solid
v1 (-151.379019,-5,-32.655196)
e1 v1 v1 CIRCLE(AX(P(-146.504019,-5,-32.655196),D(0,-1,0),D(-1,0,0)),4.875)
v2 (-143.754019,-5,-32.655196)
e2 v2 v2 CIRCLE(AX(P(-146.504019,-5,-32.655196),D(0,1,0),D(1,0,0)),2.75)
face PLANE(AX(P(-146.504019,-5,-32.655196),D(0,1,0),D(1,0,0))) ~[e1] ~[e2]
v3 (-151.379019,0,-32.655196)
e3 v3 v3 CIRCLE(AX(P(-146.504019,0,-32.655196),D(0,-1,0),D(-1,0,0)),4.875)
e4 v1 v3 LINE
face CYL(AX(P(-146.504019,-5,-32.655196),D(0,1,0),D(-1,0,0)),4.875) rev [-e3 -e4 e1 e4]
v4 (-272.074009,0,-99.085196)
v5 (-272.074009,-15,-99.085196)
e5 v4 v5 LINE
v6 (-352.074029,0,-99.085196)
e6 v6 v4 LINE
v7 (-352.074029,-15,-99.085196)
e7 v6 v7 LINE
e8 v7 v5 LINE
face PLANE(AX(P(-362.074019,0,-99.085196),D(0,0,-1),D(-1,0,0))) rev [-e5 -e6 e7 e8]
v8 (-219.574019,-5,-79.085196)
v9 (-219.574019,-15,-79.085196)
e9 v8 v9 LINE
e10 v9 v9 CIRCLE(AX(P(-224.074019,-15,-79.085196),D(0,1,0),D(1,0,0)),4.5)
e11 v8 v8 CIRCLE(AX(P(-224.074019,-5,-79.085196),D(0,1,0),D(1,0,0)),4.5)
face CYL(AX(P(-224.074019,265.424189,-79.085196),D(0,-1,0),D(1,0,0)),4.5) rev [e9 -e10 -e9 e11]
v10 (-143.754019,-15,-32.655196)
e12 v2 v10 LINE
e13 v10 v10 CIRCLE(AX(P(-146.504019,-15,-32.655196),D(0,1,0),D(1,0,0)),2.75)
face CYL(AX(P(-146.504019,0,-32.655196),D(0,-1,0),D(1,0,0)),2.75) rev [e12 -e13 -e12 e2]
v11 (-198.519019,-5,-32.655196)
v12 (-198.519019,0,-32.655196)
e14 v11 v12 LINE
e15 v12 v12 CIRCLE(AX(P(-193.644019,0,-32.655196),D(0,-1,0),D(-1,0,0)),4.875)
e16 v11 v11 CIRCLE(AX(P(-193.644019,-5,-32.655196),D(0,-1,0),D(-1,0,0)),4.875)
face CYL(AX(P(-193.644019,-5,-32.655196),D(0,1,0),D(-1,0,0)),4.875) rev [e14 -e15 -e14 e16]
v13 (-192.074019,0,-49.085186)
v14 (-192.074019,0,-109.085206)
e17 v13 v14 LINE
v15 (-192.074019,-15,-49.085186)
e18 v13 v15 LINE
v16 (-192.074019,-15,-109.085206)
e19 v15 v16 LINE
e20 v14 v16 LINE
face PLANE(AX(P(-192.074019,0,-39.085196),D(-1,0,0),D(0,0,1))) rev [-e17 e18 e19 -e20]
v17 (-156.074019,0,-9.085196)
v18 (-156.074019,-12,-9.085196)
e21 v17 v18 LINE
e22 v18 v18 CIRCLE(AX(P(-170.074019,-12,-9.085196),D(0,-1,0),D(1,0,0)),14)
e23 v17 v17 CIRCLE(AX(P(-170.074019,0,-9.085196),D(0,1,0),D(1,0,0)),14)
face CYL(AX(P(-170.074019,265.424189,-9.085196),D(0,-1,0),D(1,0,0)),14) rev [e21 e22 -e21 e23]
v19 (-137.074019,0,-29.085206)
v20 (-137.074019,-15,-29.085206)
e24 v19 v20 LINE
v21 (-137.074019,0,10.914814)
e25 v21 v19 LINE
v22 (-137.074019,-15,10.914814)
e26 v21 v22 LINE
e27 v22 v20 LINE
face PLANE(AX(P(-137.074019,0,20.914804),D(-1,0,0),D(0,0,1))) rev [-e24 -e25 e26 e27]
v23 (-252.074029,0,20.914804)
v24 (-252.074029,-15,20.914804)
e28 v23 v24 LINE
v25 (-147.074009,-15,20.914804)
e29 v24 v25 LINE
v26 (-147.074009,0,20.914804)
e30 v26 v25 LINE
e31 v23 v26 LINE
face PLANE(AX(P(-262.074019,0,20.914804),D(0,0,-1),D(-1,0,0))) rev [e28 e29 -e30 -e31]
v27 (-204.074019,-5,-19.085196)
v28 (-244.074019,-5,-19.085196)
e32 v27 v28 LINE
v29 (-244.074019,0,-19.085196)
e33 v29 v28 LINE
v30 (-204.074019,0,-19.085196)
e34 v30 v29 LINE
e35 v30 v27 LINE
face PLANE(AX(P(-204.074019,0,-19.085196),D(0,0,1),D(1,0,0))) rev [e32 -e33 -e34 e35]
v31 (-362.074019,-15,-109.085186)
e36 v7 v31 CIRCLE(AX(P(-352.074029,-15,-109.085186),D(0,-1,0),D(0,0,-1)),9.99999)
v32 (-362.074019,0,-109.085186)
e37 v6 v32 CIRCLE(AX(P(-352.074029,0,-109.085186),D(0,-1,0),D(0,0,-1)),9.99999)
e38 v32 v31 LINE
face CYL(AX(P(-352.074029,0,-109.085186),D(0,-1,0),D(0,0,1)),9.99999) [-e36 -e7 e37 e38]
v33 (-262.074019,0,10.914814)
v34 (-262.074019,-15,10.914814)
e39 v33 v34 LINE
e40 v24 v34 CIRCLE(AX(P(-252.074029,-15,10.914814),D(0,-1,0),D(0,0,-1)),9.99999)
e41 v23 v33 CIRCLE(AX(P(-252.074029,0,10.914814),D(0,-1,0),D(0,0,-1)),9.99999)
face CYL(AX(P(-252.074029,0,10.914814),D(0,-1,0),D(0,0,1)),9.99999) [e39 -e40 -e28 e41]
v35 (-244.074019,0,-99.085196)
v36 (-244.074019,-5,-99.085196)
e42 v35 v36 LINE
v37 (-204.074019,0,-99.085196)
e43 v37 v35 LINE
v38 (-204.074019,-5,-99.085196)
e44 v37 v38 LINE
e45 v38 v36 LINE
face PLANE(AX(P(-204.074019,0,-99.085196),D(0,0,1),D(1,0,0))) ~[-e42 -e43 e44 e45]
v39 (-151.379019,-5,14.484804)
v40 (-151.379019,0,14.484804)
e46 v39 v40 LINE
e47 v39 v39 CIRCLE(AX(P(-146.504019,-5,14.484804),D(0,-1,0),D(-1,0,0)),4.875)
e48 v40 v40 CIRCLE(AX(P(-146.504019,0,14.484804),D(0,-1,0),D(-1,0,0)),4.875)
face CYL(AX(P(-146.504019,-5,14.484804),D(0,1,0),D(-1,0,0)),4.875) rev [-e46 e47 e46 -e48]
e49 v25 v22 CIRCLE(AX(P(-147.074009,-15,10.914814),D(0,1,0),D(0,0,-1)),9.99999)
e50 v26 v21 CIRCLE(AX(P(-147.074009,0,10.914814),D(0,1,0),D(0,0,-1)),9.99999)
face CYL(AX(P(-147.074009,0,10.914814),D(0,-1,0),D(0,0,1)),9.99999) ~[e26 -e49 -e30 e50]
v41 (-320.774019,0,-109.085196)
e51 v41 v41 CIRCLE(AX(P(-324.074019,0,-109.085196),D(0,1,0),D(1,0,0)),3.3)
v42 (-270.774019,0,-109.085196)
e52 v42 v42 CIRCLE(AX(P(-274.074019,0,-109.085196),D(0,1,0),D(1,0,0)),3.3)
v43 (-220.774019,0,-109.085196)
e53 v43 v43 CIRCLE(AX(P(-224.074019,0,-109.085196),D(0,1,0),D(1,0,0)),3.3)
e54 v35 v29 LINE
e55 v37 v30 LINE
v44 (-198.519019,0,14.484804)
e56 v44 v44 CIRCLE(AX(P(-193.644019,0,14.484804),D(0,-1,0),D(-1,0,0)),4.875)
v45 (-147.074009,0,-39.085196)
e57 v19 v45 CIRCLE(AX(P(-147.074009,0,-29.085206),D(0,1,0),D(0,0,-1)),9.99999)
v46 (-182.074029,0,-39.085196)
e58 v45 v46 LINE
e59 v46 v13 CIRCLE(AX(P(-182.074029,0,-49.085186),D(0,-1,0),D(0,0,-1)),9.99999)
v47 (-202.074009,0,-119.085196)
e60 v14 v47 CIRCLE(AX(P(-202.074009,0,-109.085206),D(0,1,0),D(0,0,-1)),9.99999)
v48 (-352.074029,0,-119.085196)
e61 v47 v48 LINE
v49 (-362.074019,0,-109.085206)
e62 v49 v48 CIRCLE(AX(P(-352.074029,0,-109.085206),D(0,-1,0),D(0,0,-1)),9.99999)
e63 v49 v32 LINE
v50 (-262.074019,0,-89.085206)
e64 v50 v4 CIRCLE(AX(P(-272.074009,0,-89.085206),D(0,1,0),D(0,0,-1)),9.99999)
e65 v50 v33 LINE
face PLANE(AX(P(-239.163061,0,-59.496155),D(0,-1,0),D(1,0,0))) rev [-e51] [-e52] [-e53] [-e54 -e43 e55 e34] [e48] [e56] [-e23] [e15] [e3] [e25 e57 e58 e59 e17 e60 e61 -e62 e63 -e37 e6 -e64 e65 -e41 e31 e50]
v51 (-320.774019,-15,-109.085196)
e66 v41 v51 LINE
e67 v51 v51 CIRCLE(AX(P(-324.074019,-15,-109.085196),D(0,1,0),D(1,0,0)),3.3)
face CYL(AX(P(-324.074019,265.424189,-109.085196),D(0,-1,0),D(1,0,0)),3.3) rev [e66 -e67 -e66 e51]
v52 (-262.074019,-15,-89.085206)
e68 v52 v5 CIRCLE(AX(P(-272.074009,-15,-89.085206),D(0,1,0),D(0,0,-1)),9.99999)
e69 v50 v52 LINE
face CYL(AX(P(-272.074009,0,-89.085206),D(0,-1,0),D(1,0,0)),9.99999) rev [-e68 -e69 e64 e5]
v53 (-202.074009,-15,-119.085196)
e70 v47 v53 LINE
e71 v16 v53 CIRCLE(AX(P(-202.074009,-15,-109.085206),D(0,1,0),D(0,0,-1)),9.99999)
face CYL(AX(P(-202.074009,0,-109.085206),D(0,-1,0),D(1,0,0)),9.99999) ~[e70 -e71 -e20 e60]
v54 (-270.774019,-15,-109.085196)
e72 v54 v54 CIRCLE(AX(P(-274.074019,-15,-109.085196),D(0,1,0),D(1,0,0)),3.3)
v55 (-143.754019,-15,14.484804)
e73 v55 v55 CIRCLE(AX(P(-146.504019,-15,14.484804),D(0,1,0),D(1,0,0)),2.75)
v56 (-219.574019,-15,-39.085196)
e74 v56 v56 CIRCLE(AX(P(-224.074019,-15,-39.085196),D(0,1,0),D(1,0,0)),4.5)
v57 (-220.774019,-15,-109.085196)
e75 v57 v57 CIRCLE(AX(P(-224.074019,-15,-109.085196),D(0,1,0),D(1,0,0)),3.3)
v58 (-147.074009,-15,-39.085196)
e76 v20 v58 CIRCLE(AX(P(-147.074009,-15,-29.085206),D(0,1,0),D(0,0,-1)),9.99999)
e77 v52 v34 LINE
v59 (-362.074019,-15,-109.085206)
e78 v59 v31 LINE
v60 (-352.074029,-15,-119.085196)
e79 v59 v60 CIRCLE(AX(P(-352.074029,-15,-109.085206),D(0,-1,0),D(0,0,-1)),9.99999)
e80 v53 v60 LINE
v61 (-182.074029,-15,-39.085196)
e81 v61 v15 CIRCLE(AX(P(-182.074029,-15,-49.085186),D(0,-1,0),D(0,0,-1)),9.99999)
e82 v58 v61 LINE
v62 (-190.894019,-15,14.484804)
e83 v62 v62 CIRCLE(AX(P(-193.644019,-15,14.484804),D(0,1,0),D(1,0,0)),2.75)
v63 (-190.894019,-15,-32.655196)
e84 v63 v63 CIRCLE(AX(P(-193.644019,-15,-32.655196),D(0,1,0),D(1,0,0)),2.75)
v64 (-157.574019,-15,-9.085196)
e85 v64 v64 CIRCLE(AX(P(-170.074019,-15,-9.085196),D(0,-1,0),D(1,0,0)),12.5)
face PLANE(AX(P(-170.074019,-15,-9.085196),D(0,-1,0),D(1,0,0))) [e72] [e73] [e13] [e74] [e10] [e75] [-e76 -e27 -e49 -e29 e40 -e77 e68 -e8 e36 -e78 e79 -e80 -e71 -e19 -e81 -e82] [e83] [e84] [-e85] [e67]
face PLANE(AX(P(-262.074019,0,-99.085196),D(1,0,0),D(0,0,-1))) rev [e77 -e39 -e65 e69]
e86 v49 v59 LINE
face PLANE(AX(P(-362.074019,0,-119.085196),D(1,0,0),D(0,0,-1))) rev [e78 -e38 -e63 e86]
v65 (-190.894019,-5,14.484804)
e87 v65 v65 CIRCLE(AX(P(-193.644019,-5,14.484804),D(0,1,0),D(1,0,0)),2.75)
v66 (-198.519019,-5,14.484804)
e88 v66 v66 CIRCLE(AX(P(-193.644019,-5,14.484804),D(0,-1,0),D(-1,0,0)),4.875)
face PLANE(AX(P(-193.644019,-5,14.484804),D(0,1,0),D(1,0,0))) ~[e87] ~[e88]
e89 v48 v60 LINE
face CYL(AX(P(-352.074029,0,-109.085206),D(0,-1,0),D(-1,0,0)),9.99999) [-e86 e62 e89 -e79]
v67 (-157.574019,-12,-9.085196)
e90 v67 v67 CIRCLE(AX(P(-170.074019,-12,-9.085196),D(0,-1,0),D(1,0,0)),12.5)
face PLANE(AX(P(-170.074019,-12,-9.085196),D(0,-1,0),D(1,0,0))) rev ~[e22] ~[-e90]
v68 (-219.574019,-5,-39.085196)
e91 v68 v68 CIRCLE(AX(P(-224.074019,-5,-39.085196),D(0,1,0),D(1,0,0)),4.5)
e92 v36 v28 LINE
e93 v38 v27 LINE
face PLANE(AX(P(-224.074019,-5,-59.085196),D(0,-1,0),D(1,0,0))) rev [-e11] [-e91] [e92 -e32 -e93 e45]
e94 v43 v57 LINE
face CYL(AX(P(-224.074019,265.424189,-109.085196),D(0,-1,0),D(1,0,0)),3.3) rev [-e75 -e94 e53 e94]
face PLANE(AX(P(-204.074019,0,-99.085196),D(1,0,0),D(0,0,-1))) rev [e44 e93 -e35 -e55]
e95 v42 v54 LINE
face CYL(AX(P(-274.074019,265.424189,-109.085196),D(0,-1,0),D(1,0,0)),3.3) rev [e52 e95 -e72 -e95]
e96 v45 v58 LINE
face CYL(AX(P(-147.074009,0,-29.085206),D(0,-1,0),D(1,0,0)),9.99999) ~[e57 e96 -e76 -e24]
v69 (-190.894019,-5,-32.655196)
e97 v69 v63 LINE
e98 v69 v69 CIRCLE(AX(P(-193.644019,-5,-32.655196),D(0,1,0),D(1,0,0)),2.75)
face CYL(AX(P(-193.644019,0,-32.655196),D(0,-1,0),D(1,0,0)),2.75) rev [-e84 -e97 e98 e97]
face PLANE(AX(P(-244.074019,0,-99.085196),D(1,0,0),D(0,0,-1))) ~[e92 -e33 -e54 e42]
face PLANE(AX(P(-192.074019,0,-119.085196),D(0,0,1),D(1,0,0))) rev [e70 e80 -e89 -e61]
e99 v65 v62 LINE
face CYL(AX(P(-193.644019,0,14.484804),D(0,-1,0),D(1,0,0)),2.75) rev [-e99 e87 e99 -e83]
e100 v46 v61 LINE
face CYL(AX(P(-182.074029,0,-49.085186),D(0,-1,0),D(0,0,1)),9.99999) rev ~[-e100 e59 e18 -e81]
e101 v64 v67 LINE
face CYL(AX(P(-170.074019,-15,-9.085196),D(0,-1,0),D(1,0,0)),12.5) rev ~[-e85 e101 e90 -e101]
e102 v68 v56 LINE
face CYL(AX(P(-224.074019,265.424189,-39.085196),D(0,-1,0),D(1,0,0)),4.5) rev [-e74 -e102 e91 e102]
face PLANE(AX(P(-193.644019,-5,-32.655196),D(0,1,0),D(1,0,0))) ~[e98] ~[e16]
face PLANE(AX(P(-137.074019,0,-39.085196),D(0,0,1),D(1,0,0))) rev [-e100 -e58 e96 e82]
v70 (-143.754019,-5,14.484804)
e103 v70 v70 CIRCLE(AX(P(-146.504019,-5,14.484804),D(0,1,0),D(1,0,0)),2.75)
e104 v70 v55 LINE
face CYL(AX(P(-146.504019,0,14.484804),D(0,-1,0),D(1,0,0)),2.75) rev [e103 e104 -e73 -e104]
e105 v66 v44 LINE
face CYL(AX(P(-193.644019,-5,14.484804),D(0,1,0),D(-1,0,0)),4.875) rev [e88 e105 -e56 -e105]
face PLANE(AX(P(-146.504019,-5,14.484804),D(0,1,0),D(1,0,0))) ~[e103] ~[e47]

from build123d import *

# Parameters (mm, degrees)
F1_DEPTH       = 15
F2_D           = 9
F3_D           = 6.6
F4_R           = 9.99999
F5_D           = 28
F6_D           = 5.5
F6_CBORE_D     = 9.75
F6_CBORE_DEPTH = 5
F7_W           = 40
F7_H           = 80
F8_DEPTH       = 5
F11_R          = 14
F11_R_2        = 12.5
F12_DEPTH      = 3


# Not quite as in the source:
# - a fillet or chamfer is up to 0.001 mm smaller than in the source, because OpenCascade refuses the exact size


with BuildPart() as f1:
    # F0 (on Front) → F1 (new body)
    with BuildSketch(Plane.XZ):
        Polygon((62.0740194619, 20.9148037434), (-57.9259805381, 20.9148037434), (-62.9259805381, 20.9148037434), (-62.9259805381, -39.0851962566), (-57.9259805381, -39.0851962566), (-7.9259805381, -39.0851962566), (-7.9259805381, -119.0851962566), (162.0740194619, -119.0851962566), (162.0740194619, -99.0851962566), (62.0740194619, -99.0851962566), align=None)
    extrude(amount=F1_DEPTH)

    # F2 (through all)
    with Locations(Plane(origin=(0, 0, 0), x_dir=(1, 0, 0), z_dir=(0, 1, 0))):
        with Locations((24.0740194619, 79.0851962566), (24.0740194619, 39.0851962566)):
            Hole(F2_D / 2)

    # F3 (through all)
    with Locations(Plane(origin=(0, 0, 0), x_dir=(1, 0, 0), z_dir=(0, 1, 0))):
        with Locations((24.0740194619, 109.0851962566), (74.0740194619, 109.0851962566), (124.0740194619, 109.0851962566)):
            Hole(F3_D / 2)

    # F4 (radius 10 in the source; OpenCascade refuses exactly that, so slightly less here)
    f4_edges = [f1.edges().sort_by_distance(p)[0] for p in [
        (62.074019, -7.5, 20.914804),
        (62.074019, -7.5, -99.085196),
        (162.074019, -7.5, -119.085196),
        (162.074019, -7.5, -99.085196),
        (-7.925981, -7.5, -119.085196),
        (-7.925981, -7.5, -39.085196),
        (-62.925981, -7.5, 20.914804),
        (-62.925981, -7.5, -39.085196),
    ]]
    fillet(f4_edges, radius=F4_R)

    # F5 (through all)
    with Locations(Plane(origin=(0, 0, 0), x_dir=(1, 0, 0), z_dir=(0, 1, 0))):
        with Locations((-29.9259805381, 9.0851962566)):
            Hole(F5_D / 2)

    # F6 (through all)
    with Locations(Plane(origin=(0, 0, 0), x_dir=(1, 0, 0), z_dir=(0, 1, 0))):
        with Locations((-53.4959805381, -14.4848037434), (-6.3559805381, -14.4848037434), (-6.3559805381, 32.6551962566), (-53.4959805381, 32.6551962566)):
            CounterBoreHole(F6_D / 2, F6_CBORE_D / 2, F6_CBORE_DEPTH)

    # F7 (on face) → F8 (cut)
    with BuildSketch(Plane.XZ):
        with Locations((24.0740194619, -59.0851962566)):
            Rectangle(F7_W, F7_H)
    extrude(amount=F8_DEPTH, mode=Mode.SUBTRACT)


with BuildPart() as f10_1:
    # F10: instance of F1
    add(f1.part.mirror(Plane.YZ.offset(-100)))

    # F11 (on face) → F12 (join)
    with BuildSketch(Plane.XZ.offset(15)):
        with Locations((-170.0740194619, -9.0851962566)):
            Circle(F11_R)
        with Locations((-170.0740194619, -9.0851962566)):
            Circle(F11_R_2, mode=Mode.SUBTRACT)
    extrude(amount=-F12_DEPTH)


solid = f10_1.part
